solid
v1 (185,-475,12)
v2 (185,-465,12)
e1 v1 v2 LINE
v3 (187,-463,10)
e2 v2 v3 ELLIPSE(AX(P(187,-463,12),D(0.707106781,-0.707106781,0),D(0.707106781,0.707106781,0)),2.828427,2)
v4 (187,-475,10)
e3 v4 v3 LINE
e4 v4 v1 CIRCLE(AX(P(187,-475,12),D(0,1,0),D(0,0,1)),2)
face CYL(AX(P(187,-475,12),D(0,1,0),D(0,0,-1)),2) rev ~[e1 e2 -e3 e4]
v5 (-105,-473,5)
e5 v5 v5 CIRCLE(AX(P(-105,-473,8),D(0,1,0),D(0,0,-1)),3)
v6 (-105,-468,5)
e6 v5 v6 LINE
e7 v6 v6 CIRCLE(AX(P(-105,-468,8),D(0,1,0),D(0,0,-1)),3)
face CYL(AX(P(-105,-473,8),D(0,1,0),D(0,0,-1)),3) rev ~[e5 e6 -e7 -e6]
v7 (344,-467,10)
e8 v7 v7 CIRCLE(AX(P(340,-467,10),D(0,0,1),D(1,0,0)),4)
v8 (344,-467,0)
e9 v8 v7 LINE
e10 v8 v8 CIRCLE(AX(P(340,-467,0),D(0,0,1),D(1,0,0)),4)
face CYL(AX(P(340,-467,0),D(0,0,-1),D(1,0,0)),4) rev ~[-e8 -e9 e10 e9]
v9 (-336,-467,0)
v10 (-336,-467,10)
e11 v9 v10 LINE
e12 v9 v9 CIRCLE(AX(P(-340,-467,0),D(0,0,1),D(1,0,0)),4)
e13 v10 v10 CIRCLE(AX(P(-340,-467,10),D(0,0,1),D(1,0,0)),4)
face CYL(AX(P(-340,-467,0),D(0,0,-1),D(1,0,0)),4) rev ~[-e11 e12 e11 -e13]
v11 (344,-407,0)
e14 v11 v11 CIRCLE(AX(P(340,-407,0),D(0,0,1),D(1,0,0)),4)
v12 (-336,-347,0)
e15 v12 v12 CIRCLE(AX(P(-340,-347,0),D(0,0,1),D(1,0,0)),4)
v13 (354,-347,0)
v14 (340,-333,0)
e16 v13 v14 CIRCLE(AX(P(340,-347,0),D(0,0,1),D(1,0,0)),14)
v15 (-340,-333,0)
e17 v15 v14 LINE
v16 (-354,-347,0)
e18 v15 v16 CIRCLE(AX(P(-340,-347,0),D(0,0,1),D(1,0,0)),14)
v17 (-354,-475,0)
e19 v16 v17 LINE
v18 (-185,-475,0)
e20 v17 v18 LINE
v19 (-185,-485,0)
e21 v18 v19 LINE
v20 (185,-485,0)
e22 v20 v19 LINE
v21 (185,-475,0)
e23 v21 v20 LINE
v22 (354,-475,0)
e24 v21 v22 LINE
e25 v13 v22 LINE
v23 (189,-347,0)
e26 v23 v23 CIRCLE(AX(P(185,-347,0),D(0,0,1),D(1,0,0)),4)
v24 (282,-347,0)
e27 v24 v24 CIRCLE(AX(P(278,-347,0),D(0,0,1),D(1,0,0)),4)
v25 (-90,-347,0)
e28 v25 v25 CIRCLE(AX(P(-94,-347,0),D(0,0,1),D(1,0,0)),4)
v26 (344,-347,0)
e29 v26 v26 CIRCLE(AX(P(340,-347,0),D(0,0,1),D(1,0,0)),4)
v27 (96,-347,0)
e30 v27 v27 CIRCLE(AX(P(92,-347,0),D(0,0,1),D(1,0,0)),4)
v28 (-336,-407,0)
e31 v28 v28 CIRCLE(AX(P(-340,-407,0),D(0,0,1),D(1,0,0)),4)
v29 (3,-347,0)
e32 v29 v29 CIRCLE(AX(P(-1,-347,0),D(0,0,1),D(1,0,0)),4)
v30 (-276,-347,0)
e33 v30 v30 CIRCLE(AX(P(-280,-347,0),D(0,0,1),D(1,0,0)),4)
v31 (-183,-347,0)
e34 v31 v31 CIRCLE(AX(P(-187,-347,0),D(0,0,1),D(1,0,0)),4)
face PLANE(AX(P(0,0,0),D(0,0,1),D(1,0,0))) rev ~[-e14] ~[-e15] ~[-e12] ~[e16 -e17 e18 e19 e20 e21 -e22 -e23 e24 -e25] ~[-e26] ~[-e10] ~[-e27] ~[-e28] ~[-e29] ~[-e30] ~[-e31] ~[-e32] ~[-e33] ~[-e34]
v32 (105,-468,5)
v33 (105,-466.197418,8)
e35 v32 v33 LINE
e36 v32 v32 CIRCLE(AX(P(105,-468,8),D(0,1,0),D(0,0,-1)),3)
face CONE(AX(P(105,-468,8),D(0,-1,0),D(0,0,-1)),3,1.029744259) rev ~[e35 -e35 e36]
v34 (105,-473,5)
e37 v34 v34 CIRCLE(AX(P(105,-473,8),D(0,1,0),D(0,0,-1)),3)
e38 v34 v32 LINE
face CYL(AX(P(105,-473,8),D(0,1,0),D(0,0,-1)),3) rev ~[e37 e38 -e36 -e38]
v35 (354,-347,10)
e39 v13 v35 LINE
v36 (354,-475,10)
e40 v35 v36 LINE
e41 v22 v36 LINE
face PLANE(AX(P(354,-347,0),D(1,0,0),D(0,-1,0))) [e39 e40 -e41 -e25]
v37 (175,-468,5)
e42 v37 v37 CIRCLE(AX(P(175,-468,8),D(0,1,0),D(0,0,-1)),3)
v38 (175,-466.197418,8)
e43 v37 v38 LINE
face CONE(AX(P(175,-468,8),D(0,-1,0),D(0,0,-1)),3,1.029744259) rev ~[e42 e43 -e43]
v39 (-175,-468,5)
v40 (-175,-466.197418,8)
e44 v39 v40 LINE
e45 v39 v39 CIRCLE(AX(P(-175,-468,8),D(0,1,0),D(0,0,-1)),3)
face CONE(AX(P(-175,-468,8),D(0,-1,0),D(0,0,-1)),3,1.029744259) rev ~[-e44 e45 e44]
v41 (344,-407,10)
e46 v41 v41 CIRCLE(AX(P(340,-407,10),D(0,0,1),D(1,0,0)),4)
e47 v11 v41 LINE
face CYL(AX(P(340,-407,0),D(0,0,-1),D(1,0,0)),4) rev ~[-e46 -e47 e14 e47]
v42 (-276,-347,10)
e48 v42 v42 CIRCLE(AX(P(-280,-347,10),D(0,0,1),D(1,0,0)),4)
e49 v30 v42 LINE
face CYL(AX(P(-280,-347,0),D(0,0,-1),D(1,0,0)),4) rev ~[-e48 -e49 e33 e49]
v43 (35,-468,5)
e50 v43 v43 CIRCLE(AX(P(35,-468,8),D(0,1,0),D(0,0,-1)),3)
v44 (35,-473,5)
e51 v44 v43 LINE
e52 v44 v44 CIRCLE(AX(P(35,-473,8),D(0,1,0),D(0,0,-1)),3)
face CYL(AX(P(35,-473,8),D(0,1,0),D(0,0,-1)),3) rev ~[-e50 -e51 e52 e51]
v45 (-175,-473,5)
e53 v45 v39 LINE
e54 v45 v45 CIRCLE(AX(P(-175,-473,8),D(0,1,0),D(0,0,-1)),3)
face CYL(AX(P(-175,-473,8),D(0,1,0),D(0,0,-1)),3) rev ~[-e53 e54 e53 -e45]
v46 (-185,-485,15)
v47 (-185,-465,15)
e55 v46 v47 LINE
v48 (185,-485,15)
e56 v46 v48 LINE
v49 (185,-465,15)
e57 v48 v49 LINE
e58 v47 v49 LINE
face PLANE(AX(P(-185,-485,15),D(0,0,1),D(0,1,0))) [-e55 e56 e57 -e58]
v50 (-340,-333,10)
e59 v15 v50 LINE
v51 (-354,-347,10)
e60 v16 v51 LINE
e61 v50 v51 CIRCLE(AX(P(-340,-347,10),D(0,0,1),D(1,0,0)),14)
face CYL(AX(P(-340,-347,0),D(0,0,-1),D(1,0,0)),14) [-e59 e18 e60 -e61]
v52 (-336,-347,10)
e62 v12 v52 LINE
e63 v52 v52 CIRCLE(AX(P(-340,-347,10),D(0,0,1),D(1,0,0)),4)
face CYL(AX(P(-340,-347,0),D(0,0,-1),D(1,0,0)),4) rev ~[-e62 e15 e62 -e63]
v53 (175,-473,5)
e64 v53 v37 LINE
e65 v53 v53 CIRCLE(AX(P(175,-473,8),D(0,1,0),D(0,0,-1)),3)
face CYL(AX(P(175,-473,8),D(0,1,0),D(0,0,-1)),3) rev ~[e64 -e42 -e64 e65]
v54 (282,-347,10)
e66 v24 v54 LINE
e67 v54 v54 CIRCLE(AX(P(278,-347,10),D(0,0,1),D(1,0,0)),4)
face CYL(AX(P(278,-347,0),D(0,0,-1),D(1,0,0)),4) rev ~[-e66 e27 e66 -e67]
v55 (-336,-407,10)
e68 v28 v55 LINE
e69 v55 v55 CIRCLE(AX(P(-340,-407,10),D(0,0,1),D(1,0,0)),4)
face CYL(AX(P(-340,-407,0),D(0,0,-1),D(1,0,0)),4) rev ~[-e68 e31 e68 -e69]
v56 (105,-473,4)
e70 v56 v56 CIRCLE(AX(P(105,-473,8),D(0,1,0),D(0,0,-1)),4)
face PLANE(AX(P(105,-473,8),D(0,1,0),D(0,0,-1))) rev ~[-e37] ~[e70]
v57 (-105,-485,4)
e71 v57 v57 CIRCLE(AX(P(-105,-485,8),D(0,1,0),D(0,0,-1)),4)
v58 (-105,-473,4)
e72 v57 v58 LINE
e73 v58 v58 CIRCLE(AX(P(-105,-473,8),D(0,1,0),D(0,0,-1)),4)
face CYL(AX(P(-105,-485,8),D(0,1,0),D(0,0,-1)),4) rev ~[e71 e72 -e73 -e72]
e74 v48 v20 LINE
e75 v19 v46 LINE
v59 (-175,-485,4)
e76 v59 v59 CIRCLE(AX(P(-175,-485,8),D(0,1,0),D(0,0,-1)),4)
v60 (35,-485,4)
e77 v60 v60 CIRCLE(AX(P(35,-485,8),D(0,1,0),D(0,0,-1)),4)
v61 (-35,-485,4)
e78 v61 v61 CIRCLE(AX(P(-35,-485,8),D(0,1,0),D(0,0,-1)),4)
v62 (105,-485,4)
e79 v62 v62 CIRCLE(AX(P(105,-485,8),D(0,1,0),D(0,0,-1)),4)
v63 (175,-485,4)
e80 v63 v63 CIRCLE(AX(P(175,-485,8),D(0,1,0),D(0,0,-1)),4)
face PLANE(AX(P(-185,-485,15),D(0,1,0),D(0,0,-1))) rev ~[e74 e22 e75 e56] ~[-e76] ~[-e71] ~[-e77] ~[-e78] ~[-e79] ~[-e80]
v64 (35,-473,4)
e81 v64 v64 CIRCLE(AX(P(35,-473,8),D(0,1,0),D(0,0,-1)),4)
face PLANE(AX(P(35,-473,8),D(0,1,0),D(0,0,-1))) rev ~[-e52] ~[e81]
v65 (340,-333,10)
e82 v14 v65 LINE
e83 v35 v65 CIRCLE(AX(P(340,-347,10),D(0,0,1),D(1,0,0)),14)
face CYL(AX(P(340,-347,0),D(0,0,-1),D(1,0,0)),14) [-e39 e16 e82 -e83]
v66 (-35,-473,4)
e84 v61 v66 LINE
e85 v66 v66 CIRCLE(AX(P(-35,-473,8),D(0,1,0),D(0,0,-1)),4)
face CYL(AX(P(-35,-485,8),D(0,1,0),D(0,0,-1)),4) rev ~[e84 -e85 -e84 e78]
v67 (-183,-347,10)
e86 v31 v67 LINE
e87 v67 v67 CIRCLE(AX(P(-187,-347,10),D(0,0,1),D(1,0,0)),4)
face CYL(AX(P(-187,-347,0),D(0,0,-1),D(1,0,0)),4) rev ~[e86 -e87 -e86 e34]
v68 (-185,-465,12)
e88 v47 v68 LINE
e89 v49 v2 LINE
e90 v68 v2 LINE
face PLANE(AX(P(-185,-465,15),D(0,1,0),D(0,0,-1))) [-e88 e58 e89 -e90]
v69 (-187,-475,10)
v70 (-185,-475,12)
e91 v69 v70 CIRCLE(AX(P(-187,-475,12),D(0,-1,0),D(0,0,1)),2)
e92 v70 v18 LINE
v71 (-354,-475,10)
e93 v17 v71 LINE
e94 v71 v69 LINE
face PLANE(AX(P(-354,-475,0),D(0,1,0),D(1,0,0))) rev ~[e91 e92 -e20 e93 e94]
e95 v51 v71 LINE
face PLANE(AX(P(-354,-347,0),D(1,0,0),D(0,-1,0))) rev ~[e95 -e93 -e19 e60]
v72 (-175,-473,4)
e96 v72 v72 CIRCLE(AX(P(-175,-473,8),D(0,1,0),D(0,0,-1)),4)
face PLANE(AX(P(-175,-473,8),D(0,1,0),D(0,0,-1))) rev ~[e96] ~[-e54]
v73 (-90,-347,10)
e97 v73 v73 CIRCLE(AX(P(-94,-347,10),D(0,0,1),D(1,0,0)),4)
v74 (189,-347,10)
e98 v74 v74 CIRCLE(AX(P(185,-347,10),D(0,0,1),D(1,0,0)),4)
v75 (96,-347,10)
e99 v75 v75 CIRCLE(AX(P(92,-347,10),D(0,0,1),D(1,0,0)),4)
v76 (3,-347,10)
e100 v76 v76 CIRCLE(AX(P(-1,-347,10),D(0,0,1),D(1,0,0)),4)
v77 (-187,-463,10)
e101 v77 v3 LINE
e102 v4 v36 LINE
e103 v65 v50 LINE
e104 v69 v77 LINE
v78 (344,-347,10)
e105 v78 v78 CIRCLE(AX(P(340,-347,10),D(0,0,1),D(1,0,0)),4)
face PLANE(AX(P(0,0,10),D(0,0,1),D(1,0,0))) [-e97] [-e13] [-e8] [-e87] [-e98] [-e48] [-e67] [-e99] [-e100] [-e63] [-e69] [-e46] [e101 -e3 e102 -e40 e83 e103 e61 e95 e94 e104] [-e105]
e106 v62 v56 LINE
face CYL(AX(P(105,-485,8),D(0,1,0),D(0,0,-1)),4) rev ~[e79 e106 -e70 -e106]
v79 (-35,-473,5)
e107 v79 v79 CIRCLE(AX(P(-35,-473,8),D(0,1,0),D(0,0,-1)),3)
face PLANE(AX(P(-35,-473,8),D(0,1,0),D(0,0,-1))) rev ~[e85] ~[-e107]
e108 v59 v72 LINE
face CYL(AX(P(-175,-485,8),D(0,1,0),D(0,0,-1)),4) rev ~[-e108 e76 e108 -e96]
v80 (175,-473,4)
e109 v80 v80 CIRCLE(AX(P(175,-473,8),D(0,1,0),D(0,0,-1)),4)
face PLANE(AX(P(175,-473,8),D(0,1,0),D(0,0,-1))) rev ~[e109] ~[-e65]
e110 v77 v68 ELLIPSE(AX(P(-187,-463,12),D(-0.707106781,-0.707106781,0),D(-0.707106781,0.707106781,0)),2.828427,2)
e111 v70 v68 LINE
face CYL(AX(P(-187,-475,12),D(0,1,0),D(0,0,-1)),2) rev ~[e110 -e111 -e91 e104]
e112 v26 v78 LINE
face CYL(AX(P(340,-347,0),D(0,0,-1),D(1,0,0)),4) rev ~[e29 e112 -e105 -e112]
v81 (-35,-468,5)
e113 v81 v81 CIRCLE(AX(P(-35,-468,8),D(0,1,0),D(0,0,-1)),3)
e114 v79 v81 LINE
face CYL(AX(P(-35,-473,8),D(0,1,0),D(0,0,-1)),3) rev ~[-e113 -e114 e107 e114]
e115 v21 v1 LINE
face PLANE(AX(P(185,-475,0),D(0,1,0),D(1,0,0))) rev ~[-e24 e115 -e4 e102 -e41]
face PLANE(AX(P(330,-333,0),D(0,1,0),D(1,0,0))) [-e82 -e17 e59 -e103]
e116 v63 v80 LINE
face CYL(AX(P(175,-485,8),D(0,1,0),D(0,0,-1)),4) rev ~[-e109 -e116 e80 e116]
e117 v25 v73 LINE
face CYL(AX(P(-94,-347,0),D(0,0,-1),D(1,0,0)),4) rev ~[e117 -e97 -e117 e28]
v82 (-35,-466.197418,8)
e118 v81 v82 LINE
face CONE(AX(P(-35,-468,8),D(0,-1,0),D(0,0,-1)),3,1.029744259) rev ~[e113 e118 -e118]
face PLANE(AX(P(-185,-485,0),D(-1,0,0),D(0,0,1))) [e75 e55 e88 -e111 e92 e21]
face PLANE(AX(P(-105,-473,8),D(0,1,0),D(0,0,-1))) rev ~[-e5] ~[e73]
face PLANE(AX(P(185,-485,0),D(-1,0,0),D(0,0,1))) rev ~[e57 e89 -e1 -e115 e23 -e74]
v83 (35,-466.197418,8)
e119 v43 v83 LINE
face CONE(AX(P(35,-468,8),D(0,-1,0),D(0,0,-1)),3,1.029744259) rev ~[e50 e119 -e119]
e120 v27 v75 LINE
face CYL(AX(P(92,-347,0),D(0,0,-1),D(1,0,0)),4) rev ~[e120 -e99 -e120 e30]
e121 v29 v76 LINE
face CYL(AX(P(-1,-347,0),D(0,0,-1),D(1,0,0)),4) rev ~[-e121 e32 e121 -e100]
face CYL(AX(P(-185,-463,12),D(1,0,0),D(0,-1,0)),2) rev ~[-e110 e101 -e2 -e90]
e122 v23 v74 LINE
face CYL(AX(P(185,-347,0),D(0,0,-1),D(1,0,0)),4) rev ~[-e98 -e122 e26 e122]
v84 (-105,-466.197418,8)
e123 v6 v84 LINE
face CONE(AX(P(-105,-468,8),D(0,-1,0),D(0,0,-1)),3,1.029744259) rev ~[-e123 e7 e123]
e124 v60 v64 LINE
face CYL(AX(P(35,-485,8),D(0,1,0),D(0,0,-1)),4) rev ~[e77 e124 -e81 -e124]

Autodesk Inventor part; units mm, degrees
ref_plane "YZ Plane" through (0, 0, 0) normal (1, 0, 0) x (0, 1, 0)
ref_plane "XZ Plane" through (0, 0, 0) normal (0, 1, 0) x (-1, 0, 0)
ref_plane "XY Plane" through (0, 0, 0) normal (0, 0, 1) x (1, 0, 0)
ref_plane "РабПлоскость1" through (0, 0, 0) normal (0, 0, 1) x (1, 0, 0)
sketch "Эскиз1" plane through (0, 0, 0) normal (0, 0, 1) x (1, 0, 0)
  circle A0 centre (340, 472) radius 4 projected
  circle A1 centre (340, 367) radius 4 projected
  circle A2 centre (340, 322.8) radius 4 projected
  circle A3 centre (340, 218.5) radius 4 projected
  circle A4 centre (340, 114.2) radius 4 projected
  circle A5 centre (340, 9.9) radius 4 projected
  circle A6 centre (340, -94.4) radius 4 projected
  circle A7 centre (340, -198.7) radius 4 projected
  circle A8 centre (340, -303) radius 4 projected
  circle A9 centre (340, -347) radius 4 projected
  circle A10 centre (340, -407) radius 4 projected
  circle A11 centre (340, -467) radius 4 projected
  circle A12 centre (278, 472) radius 4 projected
  circle A13 centre (185, 472) radius 4 projected
  circle A14 centre (92, 472) radius 4 projected
  circle A15 centre (-1, 472) radius 4 projected
  circle A16 centre (-94, 472) radius 4 projected
  circle A17 centre (-187, 472) radius 4 projected
  circle A18 centre (-280, 472) radius 4 projected
  circle A19 centre (-340, 472) radius 4 projected
  circle A20 centre (-340, 367) radius 4 projected
  circle A21 centre (-340, 322.8) radius 4 projected
  circle A22 centre (-340, 218.5) radius 4 projected
  circle A23 centre (-340, 114.2) radius 4 projected
  circle A24 centre (-340, 9.9) radius 4 projected
  circle A25 centre (-340, -94.4) radius 4 projected
  circle A26 centre (-340, -198.7) radius 4 projected
  circle A27 centre (-340, -303) radius 4 projected
  circle A28 centre (-340, -347) radius 4 projected
  circle A29 centre (-340, -407) radius 4 projected
  circle A30 centre (-340, -467) radius 4 projected
  line L0 (165, -460) -> (165, -485) projected
  line L1 (185, -485) -> (165, -485) projected
  line L2 (-380, -475) -> (-185, -475) projected
  line L3 (380, 475) -> (350, 475) projected
  line L4 (350, 475) -> (350, 485) projected
  line L5 (-350, 485) -> (350, 485) projected
  line L6 (-350, 475) -> (-350, 485) projected
  line L7 (-350, 475) -> (-380, 475) projected
  line L8 (185, -475) -> (380, -475) projected
  line L9 (-165, -485) -> (-185, -485) projected
  line L10 (-165, -485) -> (-165, -460) projected
  line L11 (-165, -460) -> (-330, -460) projected
  line L12 (-330, 460) -> (-330, -460) projected
  line L13 (-330, 460) -> (330, 460) projected
  line L14 (330, -460) -> (330, 460) projected
  line L15 (330, -460) -> (165, -460) projected
  circle A31 centre (278, -303) radius 4 projected
  circle A32 centre (185, -303) radius 4 projected
  circle A33 centre (92, -303) radius 4 projected
  circle A34 centre (-1, -303) radius 4 projected
  circle A35 centre (-94, -303) radius 4 projected
  circle A36 centre (-187, -303) radius 4 projected
  circle A37 centre (-280, -303) radius 4 projected
  circle A38 centre (278, -347) radius 4 projected
  circle A39 centre (185, -347) radius 4 projected
  circle A40 centre (92, -347) radius 4 projected
  circle A41 centre (-1, -347) radius 4 projected
  circle A42 centre (-94, -347) radius 4 projected
  circle A43 centre (-187, -347) radius 4 projected
  circle A44 centre (-280, -347) radius 4 projected
  line L16 (-330, -291) -> (-330, -359) projected
  line L17 (-330, -359) -> (330, -359) projected
  line L18 (330, -291) -> (330, -359) projected
  line L19 (-330, -291) -> (330, -291) projected
  circle A45 centre (-340, -347) radius 14
  line L20 (-354, -347) -> (-354, -485)
  circle A46 centre (340, -347) radius 14
  line L21 (-340, -333) -> (340, -333)
  line L22 (354, -347) -> (354, -485)
  line L23 (354, -485) -> (-354, -485)
  line L24 (185, -475) -> (185, -485) projected
  line L25 (-185, -475) -> (-185, -485) projected
  spline S0 degree 3 poles (-370, 316.7157) (-371.226, 316.7157) (-372.452, 316.5956) (-375.5798, 315.9798) (-377.4441, 315.3011) (-379.4493, 314.2131) (-379.7267, 314.0539) (-380, 313.8881) knots 25.431649 25.431649 25.431649 25.431649 25.799448 25.799448 26.387926 26.387926 26.483827 26.483827 26.483827 26.483827 projected
  spline S1 degree 3 poles (-360, 299.3952) (-360, 300.6696) (-360.1945, 302.0462) (-360.9458, 304.7063) (-361.4997, 305.9906) (-363.0323, 308.8381) (-364.2894, 310.5672) (-367.0866, 313.808) (-368.6145, 315.3302) (-370, 316.7157) knots 0 0 0 0 0.382316 0.382316 0.764632 0.764632 1.352446 1.352446 1.94026 1.94026 1.94026 1.94026 projected
  line L26 (-360, 299.3952) -> (-360, 277.9108) projected
  spline S2 degree 3 poles (-370, 260.5903) (-368.6145, 261.9758) (-367.0866, 263.498) (-364.2894, 266.7388) (-363.0323, 268.4679) (-361.4997, 271.3154) (-360.9458, 272.5997) (-360.1945, 275.2598) (-360, 276.6364) (-360, 277.9108) knots 5.055322 5.055322 5.055322 5.055322 5.643136 5.643136 6.230951 6.230951 6.613267 6.613267 6.995583 6.995583 6.995583 6.995583 projected
  spline S3 degree 3 poles (-380, 263.2891) (-378.6731, 262.5173) (-377.2567, 261.8994) (-373.9153, 260.8819) (-371.9577, 260.5903) (-370, 260.5903) knots 11.600008 11.600008 11.600008 11.600008 12.060517 12.060517 12.64782 12.64782 12.64782 12.64782 projected
  line L27 (-380, 263.2891) -> (-380, -243.2891) projected
  spline S4 degree 3 poles (-370, -240.5903) (-371.2894, -240.5903) (-372.5789, -240.7163) (-375.8683, -241.3651) (-377.8293, -242.082) (-379.7569, -243.1494) (-379.8788, -243.2186) (-380, -243.2891) knots 12.64782 12.64782 12.64782 12.64782 13.034648 13.034648 13.653574 13.653574 13.695631 13.695631 13.695631 13.695631 projected
  spline S5 degree 3 poles (-360, -257.9108) (-360, -256.6364) (-360.1945, -255.2598) (-360.9458, -252.5997) (-361.4997, -251.3154) (-363.0323, -248.4679) (-364.2894, -246.7388) (-367.0866, -243.498) (-368.6145, -241.9758) (-370, -240.5903) knots 0 0 0 0 0.382316 0.382316 0.764632 0.764632 1.352446 1.352446 1.94026 1.94026 1.94026 1.94026 projected
  line L28 (-360, -257.9108) -> (-360, -279.3952) projected
  spline S6 degree 3 poles (-370, -296.7157) (-368.6145, -295.3302) (-367.0866, -293.808) (-364.2894, -290.5672) (-363.0323, -288.8381) (-361.4997, -285.9906) (-360.9458, -284.7063) (-360.1945, -282.0462) (-360, -280.6696) (-360, -279.3952) knots 5.055322 5.055322 5.055322 5.055322 5.643136 5.643136 6.230951 6.230951 6.613267 6.613267 6.995583 6.995583 6.995583 6.995583 projected
  spline S7 degree 3 poles (-380, -293.8881) (-379.7267, -294.0539) (-379.4493, -294.2131) (-377.4441, -295.3011) (-375.5798, -295.9798) (-372.452, -296.5956) (-371.226, -296.7157) (-370, -296.7157) knots -1.052177 -1.052177 -1.052177 -1.052177 -0.956277 -0.956277 -0.367799 -0.367799 0 0 0 0 projected
  line L29 (-380, -293.8881) -> (-380, -356.1119) projected
  spline S8 degree 3 poles (-370, -353.2843) (-371.226, -353.2843) (-372.452, -353.4044) (-375.5798, -354.0202) (-377.4441, -354.6989) (-379.4493, -355.7869) (-379.7267, -355.9461) (-380, -356.1119) knots 12.715825 12.715825 12.715825 12.715825 13.083623 13.083623 13.672101 13.672101 13.768002 13.768002 13.768002 13.768002 projected
  spline S9 degree 3 poles (-360, -370.6048) (-360, -369.3304) (-360.1945, -367.9538) (-360.9458, -365.2937) (-361.4997, -364.0094) (-363.0323, -361.1619) (-364.2894, -359.4328) (-367.0866, -356.192) (-368.6145, -354.6698) (-370, -353.2843) knots 0 0 0 0 0.382316 0.382316 0.764632 0.764632 1.352446 1.352446 1.94026 1.94026 1.94026 1.94026 projected
  line L30 (-360, -370.6048) -> (-360, -392.0892) projected
  spline S10 degree 3 poles (-370, -409.4097) (-368.6145, -408.0242) (-367.0866, -406.502) (-364.2894, -403.2612) (-363.0323, -401.5321) (-361.4997, -398.6846) (-360.9458, -397.4003) (-360.1945, -394.7402) (-360, -393.3636) (-360, -392.0892) knots 5.055322 5.055322 5.055322 5.055322 5.643136 5.643136 6.230951 6.230951 6.613267 6.613267 6.995583 6.995583 6.995583 6.995583 projected
  spline S11 degree 3 poles (-380, -406.7109) (-379.8788, -406.7814) (-379.7569, -406.8506) (-377.8293, -407.918) (-375.8683, -408.6349) (-372.5789, -409.2837) (-371.2894, -409.4097) (-370, -409.4097) knots -1.047812 -1.047812 -1.047812 -1.047812 -1.005754 -1.005754 -0.386829 -0.386829 0 0 0 0 projected
  line L31 (-380, -406.7109) -> (-380, -475) projected
  line L32 (380, -475) -> (380, -406.7109) projected
  spline S12 degree 3 poles (370, -409.4097) (371.2894, -409.4097) (372.5789, -409.2837) (375.8683, -408.6349) (377.8293, -407.918) (379.7569, -406.8506) (379.8788, -406.7814) (380, -406.7109) knots 12.64782 12.64782 12.64782 12.64782 13.034648 13.034648 13.653574 13.653574 13.695631 13.695631 13.695631 13.695631 projected
  spline S13 degree 3 poles (360, -392.0892) (360, -393.3636) (360.1945, -394.7402) (360.9458, -397.4003) (361.4997, -398.6846) (363.0323, -401.5321) (364.2894, -403.2612) (367.0866, -406.502) (368.6145, -408.0242) (370, -409.4097) knots 0 0 0 0 0.382316 0.382316 0.764632 0.764632 1.352446 1.352446 1.94026 1.94026 1.94026 1.94026 projected
  line L33 (360, -392.0892) -> (360, -370.6048) projected
  spline S14 degree 3 poles (370, -353.2843) (368.6145, -354.6698) (367.0866, -356.192) (364.2894, -359.4328) (363.0323, -361.1619) (361.4997, -364.0094) (360.9458, -365.2937) (360.1945, -367.9538) (360, -369.3304) (360, -370.6048) knots 5.055322 5.055322 5.055322 5.055322 5.643136 5.643136 6.230951 6.230951 6.613267 6.613267 6.995583 6.995583 6.995583 6.995583 projected
  spline S15 degree 3 poles (380, -356.1119) (378.2451, -355.0477) (376.3252, -354.255) (372.9103, -353.4538) (371.4552, -353.2843) (370, -353.2843) knots -1.052177 -1.052177 -1.052177 -1.052177 -0.436564 -0.436564 0 0 0 0 projected
  line L34 (380, -356.1119) -> (380, -293.8881) projected
  spline S16 degree 3 poles (370, -296.7157) (371.226, -296.7157) (372.452, -296.5956) (375.5798, -295.9798) (377.4441, -295.3011) (379.4493, -294.2131) (379.7267, -294.0539) (380, -293.8881) knots 12.715825 12.715825 12.715825 12.715825 13.083623 13.083623 13.672101 13.672101 13.768002 13.768002 13.768002 13.768002 projected
  spline S17 degree 3 poles (360, -279.3952) (360, -280.6696) (360.1945, -282.0462) (360.9458, -284.7063) (361.4997, -285.9906) (363.0323, -288.8381) (364.2894, -290.5672) (367.0866, -293.808) (368.6145, -295.3302) (370, -296.7157) knots 0 0 0 0 0.382316 0.382316 0.764632 0.764632 1.352446 1.352446 1.94026 1.94026 1.94026 1.94026 projected
  line L35 (360, -279.3952) -> (360, -257.9108) projected
  spline S18 degree 3 poles (370, -240.5903) (368.6145, -241.9758) (367.0866, -243.498) (364.2894, -246.7388) (363.0323, -248.4679) (361.4997, -251.3154) (360.9458, -252.5997) (360.1945, -255.2598) (360, -256.6364) (360, -257.9108) knots 5.055322 5.055322 5.055322 5.055322 5.643136 5.643136 6.230951 6.230951 6.613267 6.613267 6.995583 6.995583 6.995583 6.995583 projected
  spline S19 degree 3 poles (380, -243.2891) (378.6731, -242.5173) (377.2567, -241.8994) (373.9153, -240.8819) (371.9577, -240.5903) (370, -240.5903) knots 11.600008 11.600008 11.600008 11.600008 12.060517 12.060517 12.64782 12.64782 12.64782 12.64782 projected
  line L36 (380, -243.2891) -> (380, 263.2891) projected
  spline S20 degree 3 poles (370, 260.5903) (371.2894, 260.5903) (372.5789, 260.7163) (375.8683, 261.3651) (377.8293, 262.082) (379.7569, 263.1494) (379.8788, 263.2186) (380, 263.2891) knots 25.295639 25.295639 25.295639 25.295639 25.682468 25.682468 26.301393 26.301393 26.343451 26.343451 26.343451 26.343451 projected
  spline S21 degree 3 poles (360, 277.9108) (360, 276.6364) (360.1945, 275.2598) (360.9458, 272.5997) (361.4997, 271.3154) (363.0323, 268.4679) (364.2894, 266.7388) (367.0866, 263.498) (368.6145, 261.9758) (370, 260.5903) knots 0 0 0 0 0.382316 0.382316 0.764632 0.764632 1.352446 1.352446 1.94026 1.94026 1.94026 1.94026 projected
  line L37 (360, 277.9108) -> (360, 299.3952) projected
  spline S22 degree 3 poles (370, 316.7157) (368.6145, 315.3302) (367.0866, 313.808) (364.2894, 310.5672) (363.0323, 308.8381) (361.4997, 305.9906) (360.9458, 304.7063) (360.1945, 302.0462) (360, 300.6696) (360, 299.3952) knots 5.055322 5.055322 5.055322 5.055322 5.643136 5.643136 6.230951 6.230951 6.613267 6.613267 6.995583 6.995583 6.995583 6.995583 projected
  spline S23 degree 3 poles (380, 313.8881) (379.7267, 314.0539) (379.4493, 314.2131) (377.4441, 315.3011) (375.5798, 315.9798) (372.452, 316.5956) (371.226, 316.7157) (370, 316.7157) knots -1.052177 -1.052177 -1.052177 -1.052177 -0.956277 -0.956277 -0.367799 -0.367799 0 0 0 0 projected
  line L38 (380, 313.8881) -> (380, 376.1119) projected
  spline S24 degree 3 poles (370, 373.2843) (371.226, 373.2843) (372.452, 373.4044) (375.5798, 374.0202) (377.4441, 374.6989) (379.4493, 375.7869) (379.7267, 375.9461) (380, 376.1119) knots 25.431649 25.431649 25.431649 25.431649 25.799448 25.799448 26.387926 26.387926 26.483827 26.483827 26.483827 26.483827 projected
  spline S25 degree 3 poles (360, 390.6048) (360, 389.3304) (360.1945, 387.9538) (360.9458, 385.2937) (361.4997, 384.0094) (363.0323, 381.1619) (364.2894, 379.4328) (367.0866, 376.192) (368.6145, 374.6698) (370, 373.2843) knots 0 0 0 0 0.382316 0.382316 0.764632 0.764632 1.352446 1.352446 1.94026 1.94026 1.94026 1.94026 projected
  line L39 (360, 390.6048) -> (360, 412.0892) projected
  spline S26 degree 3 poles (370, 429.4097) (368.6145, 428.0242) (367.0866, 426.502) (364.2894, 423.2612) (363.0323, 421.5321) (361.4997, 418.6846) (360.9458, 417.4003) (360.1945, 414.7402) (360, 413.3636) (360, 412.0892) knots 5.055322 5.055322 5.055322 5.055322 5.643136 5.643136 6.230951 6.230951 6.613267 6.613267 6.995583 6.995583 6.995583 6.995583 projected
  spline S27 degree 3 poles (380, 426.7109) (378.6731, 427.4827) (377.2567, 428.1006) (373.9153, 429.1181) (371.9577, 429.4097) (370, 429.4097) knots -1.047812 -1.047812 -1.047812 -1.047812 -0.587302 -0.587302 0 0 0 0 projected
  line L40 (380, 426.7109) -> (380, 475) projected
  line L41 (-380, 475) -> (-380, 426.7109) projected
  spline S28 degree 3 poles (-370, 429.4097) (-371.2894, 429.4097) (-372.5789, 429.2837) (-375.8683, 428.6349) (-377.8293, 427.918) (-379.7569, 426.8506) (-379.8788, 426.7814) (-380, 426.7109) knots 12.64782 12.64782 12.64782 12.64782 13.034648 13.034648 13.653574 13.653574 13.695631 13.695631 13.695631 13.695631 projected
  spline S29 degree 3 poles (-360, 412.0892) (-360, 413.3636) (-360.1945, 414.7402) (-360.9458, 417.4003) (-361.4997, 418.6846) (-363.0323, 421.5321) (-364.2894, 423.2612) (-367.0866, 426.502) (-368.6145, 428.0242) (-370, 429.4097) knots 0 0 0 0 0.382316 0.382316 0.764632 0.764632 1.352446 1.352446 1.94026 1.94026 1.94026 1.94026 projected
  line L42 (-360, 412.0892) -> (-360, 390.6048) projected
  spline S30 degree 3 poles (-370, 373.2843) (-368.6145, 374.6698) (-367.0866, 376.192) (-364.2894, 379.4328) (-363.0323, 381.1619) (-361.4997, 384.0094) (-360.9458, 385.2937) (-360.1945, 387.9538) (-360, 389.3304) (-360, 390.6048) knots 5.055322 5.055322 5.055322 5.055322 5.643136 5.643136 6.230951 6.230951 6.613267 6.613267 6.995583 6.995583 6.995583 6.995583 projected
  spline S31 degree 3 poles (-380, 376.1119) (-379.7267, 375.9461) (-379.4493, 375.7869) (-377.4441, 374.6989) (-375.5798, 374.0202) (-372.452, 373.4044) (-371.226, 373.2843) (-370, 373.2843) knots -1.052177 -1.052177 -1.052177 -1.052177 -0.956277 -0.956277 -0.367799 -0.367799 0 0 0 0 projected
  line L43 (-380, 376.1119) -> (-380, 313.8881) projected
  point P0 (0, 0)
  point P1 (-354, -475)
  point P2 (354, -475)
  dimension "d0" = 10
  dimension "d1" = 10
extrude "Выдавливание1" add sketch "Эскиз1" along normal blind 10 contours L15 L14 A46 L22 L8 L24 L1 L0 | L0 L23 L10 L11 L12 L17 L14 L15 | L9 L25 L2 L20 A45 L12 L11 L10 | L17 L12 A45 L21 L14 A46 | A46 L14 | L14 A46 | L14 L21 A46 | A45 L12 | L12 A45 | A45 L21 L12
sketch "Эскиз2" plane through (0, 0, 10) normal (0, 0, 1) x (1, 0, 0)
  point P0 (0, 0)
sketch "Эскиз3" plane through (-185, -485, 0) normal (-1, 0, 0) x (0, 0, 1)
  line L0 (0, 10) -> (0, 0) projected
  line L1 (0, 0) -> (10, 0) projected
  line L2 (10, 10) -> (10, 0) projected
  line L3 (0, 10) -> (10, 10) projected
  line L4 (15, 0) -> (-415, 0) projected
  line L5 (-415, 0) -> (-415, -40) projected
  line L6 (-400, -40) -> (-415, -40) projected
  line L7 (-400, -10) -> (-400, -40) projected
  line L8 (15, -10) -> (-400, -10) projected
  line L9 (15, 0) -> (15, -10) projected
  line L10 (15, 0) -> (15, 20)
  line L11 (10, 10) -> (10, 138) projected
  line L12 (10, 138) -> (10, 10) projected
  line L13 (15, 20) -> (10, 20)
  point P0 (0, 485)
  dimension "d14" = 20
extrude "Выдавливание2" add sketch "Эскиз3" against normal blind 370 contours L11 L13 L10 L4 L2
fillet "Сопряжение1" radius 2 3 edges at (-185, -470, 10) (0, -465, 10) (185, -470, 10)
sketch "Эскиз4" plane through (-185, -485, 0) normal (0, -1, 0) x (1, 0, 0)
  circle A0 centre (360, 8) radius 4.5 projected
  circle A1 centre (290, 8) radius 4.5 projected
  circle A2 centre (220, 8) radius 4.5 projected
  circle A3 centre (150, 8) radius 4.5 projected
  circle A4 centre (80, 8) radius 4.5 projected
  circle A5 centre (10, 8) radius 4.5 projected
  point P0 (185, 0)
hole "Отверстие1" at (-175, -485, 8) at (-105, -485, 8) at (-35, -485, 8) at (35, -485, 8) at (105, -485, 8) at (175, -485, 8) direction (0, 1, 0) diameter 6 depth 17 tip angle 118 counterbore diameter 8 counterbore depth 12
thread "Резьба1" size "M8x1.25" class "6H" standard "ANSI Metric M Profile" full length
thread "Резьба2" size "M8x1.25" class "6H" standard "ANSI Metric M Profile" full length
thread "Резьба3" size "M8x1.25" class "6H" standard "ANSI Metric M Profile" full length
thread "Резьба4" size "M8x1.25" class "6H" standard "ANSI Metric M Profile" full length
thread "Резьба5" size "M8x1.25" class "6H" standard "ANSI Metric M Profile" full length
thread "Резьба6" size "M8x1.25" class "6H" standard "ANSI Metric M Profile" full length
properties part number "Крышка картера 1" material "Чугун, серый"
